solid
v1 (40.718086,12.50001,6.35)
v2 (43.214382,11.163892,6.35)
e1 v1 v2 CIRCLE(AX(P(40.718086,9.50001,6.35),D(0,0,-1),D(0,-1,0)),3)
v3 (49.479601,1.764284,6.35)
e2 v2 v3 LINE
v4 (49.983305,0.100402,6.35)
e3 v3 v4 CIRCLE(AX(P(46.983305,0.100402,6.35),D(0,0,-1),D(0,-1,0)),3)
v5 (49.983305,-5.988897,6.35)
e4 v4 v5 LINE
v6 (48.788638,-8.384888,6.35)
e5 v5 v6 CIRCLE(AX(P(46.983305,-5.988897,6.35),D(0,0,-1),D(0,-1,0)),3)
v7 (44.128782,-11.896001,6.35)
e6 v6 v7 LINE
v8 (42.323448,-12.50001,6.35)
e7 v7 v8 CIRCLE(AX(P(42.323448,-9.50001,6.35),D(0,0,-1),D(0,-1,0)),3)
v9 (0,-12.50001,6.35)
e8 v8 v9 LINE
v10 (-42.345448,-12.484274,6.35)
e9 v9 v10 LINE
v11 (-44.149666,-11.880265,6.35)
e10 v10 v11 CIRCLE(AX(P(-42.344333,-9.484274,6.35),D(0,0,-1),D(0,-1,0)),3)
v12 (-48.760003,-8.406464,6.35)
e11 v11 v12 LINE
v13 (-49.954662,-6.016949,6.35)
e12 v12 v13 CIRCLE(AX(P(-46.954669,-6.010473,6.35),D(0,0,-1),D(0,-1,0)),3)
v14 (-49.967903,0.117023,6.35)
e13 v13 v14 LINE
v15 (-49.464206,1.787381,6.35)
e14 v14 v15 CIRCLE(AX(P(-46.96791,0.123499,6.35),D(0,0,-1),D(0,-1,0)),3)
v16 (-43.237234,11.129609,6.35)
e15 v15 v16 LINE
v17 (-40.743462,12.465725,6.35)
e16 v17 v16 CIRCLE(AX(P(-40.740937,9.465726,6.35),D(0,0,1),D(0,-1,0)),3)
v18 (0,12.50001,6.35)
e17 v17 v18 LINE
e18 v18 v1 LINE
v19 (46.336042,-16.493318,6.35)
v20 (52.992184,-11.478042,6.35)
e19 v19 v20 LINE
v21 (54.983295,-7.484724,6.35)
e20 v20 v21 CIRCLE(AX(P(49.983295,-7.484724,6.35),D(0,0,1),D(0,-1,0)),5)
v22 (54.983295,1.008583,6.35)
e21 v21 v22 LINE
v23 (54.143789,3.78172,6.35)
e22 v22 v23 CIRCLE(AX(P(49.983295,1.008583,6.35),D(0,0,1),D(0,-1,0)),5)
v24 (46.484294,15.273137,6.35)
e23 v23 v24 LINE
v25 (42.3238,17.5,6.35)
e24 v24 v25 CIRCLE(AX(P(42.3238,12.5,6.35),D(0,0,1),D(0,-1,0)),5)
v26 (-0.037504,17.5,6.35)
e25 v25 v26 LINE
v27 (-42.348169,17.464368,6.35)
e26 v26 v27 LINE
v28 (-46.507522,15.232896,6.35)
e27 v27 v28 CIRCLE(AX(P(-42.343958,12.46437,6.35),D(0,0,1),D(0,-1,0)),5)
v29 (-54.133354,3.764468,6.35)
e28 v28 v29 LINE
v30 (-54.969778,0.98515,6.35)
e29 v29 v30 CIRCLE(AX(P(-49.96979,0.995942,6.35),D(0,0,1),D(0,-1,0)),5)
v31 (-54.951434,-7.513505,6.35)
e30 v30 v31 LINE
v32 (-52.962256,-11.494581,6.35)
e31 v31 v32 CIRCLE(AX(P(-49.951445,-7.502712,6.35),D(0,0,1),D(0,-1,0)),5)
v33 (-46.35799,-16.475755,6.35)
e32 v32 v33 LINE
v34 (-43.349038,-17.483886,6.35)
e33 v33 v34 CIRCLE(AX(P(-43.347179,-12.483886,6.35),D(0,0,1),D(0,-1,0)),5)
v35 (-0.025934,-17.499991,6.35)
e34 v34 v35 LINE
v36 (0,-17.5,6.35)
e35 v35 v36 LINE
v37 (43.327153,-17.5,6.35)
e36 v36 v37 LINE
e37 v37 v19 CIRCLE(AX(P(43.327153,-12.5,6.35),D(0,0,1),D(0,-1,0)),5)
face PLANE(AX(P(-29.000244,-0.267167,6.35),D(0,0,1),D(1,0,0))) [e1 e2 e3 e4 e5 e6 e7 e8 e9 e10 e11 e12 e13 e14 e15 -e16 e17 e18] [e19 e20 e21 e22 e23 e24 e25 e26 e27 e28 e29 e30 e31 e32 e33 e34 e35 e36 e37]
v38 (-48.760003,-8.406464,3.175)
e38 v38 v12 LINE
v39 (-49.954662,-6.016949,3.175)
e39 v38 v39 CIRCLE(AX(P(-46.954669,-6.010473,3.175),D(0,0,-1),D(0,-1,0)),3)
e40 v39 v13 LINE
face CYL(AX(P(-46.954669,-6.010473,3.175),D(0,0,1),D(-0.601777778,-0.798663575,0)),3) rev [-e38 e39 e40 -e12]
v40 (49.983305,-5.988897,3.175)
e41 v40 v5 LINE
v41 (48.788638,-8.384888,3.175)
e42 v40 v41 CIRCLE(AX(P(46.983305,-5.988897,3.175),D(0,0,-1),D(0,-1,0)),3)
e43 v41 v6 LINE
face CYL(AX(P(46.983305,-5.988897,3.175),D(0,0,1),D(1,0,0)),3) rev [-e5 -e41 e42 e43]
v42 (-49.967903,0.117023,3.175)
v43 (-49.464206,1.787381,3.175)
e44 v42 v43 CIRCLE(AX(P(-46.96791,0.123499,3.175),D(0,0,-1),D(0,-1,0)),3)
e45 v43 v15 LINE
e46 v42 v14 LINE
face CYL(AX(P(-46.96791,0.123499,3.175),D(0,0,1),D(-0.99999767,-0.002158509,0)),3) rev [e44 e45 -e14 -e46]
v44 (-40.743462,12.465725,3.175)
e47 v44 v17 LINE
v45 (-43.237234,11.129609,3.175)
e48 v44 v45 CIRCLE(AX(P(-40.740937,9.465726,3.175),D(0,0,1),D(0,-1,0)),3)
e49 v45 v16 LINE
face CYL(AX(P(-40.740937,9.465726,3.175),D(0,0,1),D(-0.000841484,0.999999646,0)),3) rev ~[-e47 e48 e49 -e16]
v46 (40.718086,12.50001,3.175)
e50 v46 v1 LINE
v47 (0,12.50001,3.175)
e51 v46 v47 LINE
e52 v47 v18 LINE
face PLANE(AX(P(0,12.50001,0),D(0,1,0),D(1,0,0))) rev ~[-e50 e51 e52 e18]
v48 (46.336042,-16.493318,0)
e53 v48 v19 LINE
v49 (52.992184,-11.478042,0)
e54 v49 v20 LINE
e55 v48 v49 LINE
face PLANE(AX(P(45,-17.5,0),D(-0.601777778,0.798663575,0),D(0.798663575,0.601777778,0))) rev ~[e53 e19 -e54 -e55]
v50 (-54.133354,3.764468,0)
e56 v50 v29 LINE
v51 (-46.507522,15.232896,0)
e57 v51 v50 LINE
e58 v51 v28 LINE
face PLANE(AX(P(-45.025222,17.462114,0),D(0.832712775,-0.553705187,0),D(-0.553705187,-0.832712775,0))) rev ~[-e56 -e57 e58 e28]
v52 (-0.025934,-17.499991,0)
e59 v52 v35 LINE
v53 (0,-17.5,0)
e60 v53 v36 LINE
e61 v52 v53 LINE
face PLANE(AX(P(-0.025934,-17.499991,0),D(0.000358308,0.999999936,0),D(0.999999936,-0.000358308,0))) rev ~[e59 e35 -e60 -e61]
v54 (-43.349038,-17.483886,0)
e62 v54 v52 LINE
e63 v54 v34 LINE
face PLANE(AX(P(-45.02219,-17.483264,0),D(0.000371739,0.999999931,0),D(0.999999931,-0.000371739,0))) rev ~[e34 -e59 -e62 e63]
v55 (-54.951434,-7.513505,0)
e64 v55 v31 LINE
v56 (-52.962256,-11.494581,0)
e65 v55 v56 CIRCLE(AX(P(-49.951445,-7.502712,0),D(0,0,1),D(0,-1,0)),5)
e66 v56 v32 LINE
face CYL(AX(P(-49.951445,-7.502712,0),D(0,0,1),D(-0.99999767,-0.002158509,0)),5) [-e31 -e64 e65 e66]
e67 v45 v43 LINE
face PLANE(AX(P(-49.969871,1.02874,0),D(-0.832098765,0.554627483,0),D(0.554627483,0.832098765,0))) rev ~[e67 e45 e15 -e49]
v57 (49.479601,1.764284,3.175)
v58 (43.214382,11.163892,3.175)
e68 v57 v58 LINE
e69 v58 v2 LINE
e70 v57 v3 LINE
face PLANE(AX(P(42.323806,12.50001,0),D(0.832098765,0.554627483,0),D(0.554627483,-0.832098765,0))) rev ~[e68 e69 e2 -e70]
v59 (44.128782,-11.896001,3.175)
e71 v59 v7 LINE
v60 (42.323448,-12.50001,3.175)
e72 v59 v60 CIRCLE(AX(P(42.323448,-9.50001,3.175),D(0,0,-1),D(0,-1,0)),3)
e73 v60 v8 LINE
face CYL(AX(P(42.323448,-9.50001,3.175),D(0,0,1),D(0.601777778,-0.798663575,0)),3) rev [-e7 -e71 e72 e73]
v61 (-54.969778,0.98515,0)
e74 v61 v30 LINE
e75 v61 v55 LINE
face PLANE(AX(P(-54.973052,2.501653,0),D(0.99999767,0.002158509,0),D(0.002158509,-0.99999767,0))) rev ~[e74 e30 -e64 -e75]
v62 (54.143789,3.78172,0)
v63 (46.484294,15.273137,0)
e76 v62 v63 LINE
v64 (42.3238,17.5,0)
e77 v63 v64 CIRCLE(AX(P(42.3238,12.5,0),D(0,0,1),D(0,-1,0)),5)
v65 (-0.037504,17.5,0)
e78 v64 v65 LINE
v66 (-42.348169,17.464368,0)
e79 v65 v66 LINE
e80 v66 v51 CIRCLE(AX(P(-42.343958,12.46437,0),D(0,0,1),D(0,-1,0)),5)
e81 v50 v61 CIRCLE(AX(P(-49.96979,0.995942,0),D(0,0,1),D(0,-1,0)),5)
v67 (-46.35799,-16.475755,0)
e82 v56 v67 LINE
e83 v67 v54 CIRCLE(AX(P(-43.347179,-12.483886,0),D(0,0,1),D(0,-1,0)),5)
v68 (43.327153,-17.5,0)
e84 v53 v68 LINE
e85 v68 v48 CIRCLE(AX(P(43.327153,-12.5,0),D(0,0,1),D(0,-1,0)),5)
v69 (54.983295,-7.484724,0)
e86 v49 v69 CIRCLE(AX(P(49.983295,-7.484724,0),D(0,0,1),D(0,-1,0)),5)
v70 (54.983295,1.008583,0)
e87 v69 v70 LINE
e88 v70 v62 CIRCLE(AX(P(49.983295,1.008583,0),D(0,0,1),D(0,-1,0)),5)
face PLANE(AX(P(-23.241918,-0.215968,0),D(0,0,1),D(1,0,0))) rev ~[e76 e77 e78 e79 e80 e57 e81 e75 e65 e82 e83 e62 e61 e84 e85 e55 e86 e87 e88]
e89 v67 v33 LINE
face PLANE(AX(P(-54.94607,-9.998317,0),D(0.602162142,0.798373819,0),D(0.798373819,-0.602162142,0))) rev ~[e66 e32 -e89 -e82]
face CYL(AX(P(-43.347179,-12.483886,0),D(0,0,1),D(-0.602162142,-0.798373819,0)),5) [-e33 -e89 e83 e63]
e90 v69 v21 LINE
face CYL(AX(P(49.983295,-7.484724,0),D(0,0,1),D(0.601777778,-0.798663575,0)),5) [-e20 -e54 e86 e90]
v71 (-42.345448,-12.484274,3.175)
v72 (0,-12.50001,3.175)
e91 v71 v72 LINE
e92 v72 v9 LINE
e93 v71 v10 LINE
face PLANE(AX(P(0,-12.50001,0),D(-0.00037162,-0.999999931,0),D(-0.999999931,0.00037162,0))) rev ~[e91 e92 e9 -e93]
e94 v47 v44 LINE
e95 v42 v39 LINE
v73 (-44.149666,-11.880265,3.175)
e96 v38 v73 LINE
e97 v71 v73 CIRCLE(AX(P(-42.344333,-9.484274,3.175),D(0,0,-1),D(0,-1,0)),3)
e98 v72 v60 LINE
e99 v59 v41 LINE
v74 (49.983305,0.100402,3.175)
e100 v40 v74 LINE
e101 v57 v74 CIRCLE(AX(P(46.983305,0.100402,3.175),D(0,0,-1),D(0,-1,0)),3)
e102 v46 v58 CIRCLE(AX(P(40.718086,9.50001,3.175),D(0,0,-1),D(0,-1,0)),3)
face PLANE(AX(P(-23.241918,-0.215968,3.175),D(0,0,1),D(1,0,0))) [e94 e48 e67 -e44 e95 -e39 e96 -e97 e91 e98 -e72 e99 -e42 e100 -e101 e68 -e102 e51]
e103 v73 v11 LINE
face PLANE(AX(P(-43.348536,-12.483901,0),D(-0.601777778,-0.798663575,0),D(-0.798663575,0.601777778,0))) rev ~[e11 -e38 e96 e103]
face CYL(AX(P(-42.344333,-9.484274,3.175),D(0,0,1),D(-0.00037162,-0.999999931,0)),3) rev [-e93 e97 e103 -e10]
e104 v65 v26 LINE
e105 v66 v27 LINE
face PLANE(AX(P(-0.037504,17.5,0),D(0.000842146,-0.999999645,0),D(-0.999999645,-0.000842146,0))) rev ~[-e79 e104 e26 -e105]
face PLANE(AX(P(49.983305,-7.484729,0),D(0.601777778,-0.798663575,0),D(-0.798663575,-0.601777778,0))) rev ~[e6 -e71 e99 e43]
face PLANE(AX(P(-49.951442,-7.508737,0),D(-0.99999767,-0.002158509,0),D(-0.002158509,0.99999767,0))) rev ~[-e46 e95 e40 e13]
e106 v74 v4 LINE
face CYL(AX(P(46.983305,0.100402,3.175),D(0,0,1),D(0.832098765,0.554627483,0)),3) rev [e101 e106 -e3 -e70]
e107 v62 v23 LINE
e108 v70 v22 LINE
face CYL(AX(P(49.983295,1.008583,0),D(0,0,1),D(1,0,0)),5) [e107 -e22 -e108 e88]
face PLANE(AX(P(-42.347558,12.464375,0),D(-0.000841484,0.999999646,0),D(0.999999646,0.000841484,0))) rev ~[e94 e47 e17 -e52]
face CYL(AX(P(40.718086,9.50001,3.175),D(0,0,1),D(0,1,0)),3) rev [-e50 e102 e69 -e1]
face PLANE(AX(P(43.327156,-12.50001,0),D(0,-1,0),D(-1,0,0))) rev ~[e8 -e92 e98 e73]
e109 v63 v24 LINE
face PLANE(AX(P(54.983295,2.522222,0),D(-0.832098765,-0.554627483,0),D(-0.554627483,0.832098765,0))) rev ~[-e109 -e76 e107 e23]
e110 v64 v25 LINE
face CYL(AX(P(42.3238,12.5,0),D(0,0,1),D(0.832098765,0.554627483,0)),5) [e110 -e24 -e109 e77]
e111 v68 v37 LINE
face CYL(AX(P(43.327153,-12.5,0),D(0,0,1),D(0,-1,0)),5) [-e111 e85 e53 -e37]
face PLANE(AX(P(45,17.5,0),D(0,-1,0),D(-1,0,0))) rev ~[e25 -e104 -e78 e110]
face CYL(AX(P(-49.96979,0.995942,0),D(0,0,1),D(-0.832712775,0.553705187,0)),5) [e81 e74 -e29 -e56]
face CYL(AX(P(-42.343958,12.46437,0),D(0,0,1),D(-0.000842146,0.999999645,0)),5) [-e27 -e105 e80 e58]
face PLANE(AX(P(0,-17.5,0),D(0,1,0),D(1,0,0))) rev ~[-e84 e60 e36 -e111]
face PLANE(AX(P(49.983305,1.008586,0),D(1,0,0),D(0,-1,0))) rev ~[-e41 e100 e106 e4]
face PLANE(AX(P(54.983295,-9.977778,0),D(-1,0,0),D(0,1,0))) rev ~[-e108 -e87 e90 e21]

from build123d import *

# Parameters (mm, degrees)
F1_DEPTH = 6.35
F2_DEPTH = 3.175
F3_R     = 5
F4_R     = 3


# Not quite as in the source:
# - ends of sketch curves that miss each other by under 0.0002 mm in the source are joined
# - a feature names something its author has since deleted; it is built from what else it names


with BuildPart() as f1:
    # F0 (on Top) → F1 (new body)
    with BuildSketch(Plane.XY):
        Polygon((0, 12.50001), (0, 17.5), (-0.0375035219, 17.5), (-45.0252224641, 17.4621137515), (-54.9730516553, 2.5016534816), (-54.9460702886, -9.9983173986), (-45.0221895285, -17.4832638625), (-0.0259340823, -17.4999907076), (0, -17.5), (0, -12.50001), (-43.3485360617, -12.4839008237), (-49.9514424363, -7.508736751), (-49.9698707033, 1.0287403501), (-42.3475575474, 12.4643751943), align=None)
        Polygon((54.9832946886, 2.5222222222), (45, 17.5), (0, 17.5), (0, 12.50001), (42.3238055081, 12.50001), (49.9833046886, 1.0085855561), (49.9833046886, -7.4847291513), (43.3271563883, -12.50001), (0, -12.50001), (0, -17.5), (45, -17.5), (54.9832946886, -9.9777777778), align=None)
    extrude(amount=F1_DEPTH)

    # F0 (on Top) → F2 (join)
    with BuildSketch(Plane.XY):
        Polygon((0, -12.50001), (0, 12.50001), (-42.3475575474, 12.4643751943), (-49.9698707033, 1.0287403501), (-49.9514424363, -7.508736751), (-43.3485360617, -12.4839008237), align=None)
        Polygon((42.3238055081, 12.50001), (0, 12.50001), (0, -12.50001), (43.3271563883, -12.50001), (49.9833046886, -7.4847291513), (49.9833046886, 1.0085855561), align=None)
    extrude(amount=F2_DEPTH)

    # F3
    f3_edges = [f1.edges().sort_by_distance(p)[0] for p in [
        (-45.02219, -17.483264, 3.175),
        (-45.025222, 17.462114, 3.175),
        (45, 17.5, 3.175),
        (54.983295, 2.522222, 3.175),
        (54.983295, -9.977778, 3.175),
        (45, -17.5, 3.175),
        (-54.973052, 2.501653, 3.175),
        (-54.94607, -9.998317, 3.175),
    ]]
    fillet(f3_edges, radius=F3_R)

    # F4
    f4_edges = [f1.edges().sort_by_distance(p)[0] for p in [
        (-42.347558, 12.464375, 4.7625),
        (-49.969871, 1.02874, 4.7625),
        (-49.951442, -7.508737, 4.7625),
        (-43.348536, -12.483901, 4.7625),
        (43.327156, -12.50001, 4.7625),
        (49.983305, -7.484729, 4.7625),
        (49.983305, 1.008586, 4.7625),
        (42.323806, 12.50001, 4.7625),
    ]]
    fillet(f4_edges, radius=F4_R)


solid = f1.part
